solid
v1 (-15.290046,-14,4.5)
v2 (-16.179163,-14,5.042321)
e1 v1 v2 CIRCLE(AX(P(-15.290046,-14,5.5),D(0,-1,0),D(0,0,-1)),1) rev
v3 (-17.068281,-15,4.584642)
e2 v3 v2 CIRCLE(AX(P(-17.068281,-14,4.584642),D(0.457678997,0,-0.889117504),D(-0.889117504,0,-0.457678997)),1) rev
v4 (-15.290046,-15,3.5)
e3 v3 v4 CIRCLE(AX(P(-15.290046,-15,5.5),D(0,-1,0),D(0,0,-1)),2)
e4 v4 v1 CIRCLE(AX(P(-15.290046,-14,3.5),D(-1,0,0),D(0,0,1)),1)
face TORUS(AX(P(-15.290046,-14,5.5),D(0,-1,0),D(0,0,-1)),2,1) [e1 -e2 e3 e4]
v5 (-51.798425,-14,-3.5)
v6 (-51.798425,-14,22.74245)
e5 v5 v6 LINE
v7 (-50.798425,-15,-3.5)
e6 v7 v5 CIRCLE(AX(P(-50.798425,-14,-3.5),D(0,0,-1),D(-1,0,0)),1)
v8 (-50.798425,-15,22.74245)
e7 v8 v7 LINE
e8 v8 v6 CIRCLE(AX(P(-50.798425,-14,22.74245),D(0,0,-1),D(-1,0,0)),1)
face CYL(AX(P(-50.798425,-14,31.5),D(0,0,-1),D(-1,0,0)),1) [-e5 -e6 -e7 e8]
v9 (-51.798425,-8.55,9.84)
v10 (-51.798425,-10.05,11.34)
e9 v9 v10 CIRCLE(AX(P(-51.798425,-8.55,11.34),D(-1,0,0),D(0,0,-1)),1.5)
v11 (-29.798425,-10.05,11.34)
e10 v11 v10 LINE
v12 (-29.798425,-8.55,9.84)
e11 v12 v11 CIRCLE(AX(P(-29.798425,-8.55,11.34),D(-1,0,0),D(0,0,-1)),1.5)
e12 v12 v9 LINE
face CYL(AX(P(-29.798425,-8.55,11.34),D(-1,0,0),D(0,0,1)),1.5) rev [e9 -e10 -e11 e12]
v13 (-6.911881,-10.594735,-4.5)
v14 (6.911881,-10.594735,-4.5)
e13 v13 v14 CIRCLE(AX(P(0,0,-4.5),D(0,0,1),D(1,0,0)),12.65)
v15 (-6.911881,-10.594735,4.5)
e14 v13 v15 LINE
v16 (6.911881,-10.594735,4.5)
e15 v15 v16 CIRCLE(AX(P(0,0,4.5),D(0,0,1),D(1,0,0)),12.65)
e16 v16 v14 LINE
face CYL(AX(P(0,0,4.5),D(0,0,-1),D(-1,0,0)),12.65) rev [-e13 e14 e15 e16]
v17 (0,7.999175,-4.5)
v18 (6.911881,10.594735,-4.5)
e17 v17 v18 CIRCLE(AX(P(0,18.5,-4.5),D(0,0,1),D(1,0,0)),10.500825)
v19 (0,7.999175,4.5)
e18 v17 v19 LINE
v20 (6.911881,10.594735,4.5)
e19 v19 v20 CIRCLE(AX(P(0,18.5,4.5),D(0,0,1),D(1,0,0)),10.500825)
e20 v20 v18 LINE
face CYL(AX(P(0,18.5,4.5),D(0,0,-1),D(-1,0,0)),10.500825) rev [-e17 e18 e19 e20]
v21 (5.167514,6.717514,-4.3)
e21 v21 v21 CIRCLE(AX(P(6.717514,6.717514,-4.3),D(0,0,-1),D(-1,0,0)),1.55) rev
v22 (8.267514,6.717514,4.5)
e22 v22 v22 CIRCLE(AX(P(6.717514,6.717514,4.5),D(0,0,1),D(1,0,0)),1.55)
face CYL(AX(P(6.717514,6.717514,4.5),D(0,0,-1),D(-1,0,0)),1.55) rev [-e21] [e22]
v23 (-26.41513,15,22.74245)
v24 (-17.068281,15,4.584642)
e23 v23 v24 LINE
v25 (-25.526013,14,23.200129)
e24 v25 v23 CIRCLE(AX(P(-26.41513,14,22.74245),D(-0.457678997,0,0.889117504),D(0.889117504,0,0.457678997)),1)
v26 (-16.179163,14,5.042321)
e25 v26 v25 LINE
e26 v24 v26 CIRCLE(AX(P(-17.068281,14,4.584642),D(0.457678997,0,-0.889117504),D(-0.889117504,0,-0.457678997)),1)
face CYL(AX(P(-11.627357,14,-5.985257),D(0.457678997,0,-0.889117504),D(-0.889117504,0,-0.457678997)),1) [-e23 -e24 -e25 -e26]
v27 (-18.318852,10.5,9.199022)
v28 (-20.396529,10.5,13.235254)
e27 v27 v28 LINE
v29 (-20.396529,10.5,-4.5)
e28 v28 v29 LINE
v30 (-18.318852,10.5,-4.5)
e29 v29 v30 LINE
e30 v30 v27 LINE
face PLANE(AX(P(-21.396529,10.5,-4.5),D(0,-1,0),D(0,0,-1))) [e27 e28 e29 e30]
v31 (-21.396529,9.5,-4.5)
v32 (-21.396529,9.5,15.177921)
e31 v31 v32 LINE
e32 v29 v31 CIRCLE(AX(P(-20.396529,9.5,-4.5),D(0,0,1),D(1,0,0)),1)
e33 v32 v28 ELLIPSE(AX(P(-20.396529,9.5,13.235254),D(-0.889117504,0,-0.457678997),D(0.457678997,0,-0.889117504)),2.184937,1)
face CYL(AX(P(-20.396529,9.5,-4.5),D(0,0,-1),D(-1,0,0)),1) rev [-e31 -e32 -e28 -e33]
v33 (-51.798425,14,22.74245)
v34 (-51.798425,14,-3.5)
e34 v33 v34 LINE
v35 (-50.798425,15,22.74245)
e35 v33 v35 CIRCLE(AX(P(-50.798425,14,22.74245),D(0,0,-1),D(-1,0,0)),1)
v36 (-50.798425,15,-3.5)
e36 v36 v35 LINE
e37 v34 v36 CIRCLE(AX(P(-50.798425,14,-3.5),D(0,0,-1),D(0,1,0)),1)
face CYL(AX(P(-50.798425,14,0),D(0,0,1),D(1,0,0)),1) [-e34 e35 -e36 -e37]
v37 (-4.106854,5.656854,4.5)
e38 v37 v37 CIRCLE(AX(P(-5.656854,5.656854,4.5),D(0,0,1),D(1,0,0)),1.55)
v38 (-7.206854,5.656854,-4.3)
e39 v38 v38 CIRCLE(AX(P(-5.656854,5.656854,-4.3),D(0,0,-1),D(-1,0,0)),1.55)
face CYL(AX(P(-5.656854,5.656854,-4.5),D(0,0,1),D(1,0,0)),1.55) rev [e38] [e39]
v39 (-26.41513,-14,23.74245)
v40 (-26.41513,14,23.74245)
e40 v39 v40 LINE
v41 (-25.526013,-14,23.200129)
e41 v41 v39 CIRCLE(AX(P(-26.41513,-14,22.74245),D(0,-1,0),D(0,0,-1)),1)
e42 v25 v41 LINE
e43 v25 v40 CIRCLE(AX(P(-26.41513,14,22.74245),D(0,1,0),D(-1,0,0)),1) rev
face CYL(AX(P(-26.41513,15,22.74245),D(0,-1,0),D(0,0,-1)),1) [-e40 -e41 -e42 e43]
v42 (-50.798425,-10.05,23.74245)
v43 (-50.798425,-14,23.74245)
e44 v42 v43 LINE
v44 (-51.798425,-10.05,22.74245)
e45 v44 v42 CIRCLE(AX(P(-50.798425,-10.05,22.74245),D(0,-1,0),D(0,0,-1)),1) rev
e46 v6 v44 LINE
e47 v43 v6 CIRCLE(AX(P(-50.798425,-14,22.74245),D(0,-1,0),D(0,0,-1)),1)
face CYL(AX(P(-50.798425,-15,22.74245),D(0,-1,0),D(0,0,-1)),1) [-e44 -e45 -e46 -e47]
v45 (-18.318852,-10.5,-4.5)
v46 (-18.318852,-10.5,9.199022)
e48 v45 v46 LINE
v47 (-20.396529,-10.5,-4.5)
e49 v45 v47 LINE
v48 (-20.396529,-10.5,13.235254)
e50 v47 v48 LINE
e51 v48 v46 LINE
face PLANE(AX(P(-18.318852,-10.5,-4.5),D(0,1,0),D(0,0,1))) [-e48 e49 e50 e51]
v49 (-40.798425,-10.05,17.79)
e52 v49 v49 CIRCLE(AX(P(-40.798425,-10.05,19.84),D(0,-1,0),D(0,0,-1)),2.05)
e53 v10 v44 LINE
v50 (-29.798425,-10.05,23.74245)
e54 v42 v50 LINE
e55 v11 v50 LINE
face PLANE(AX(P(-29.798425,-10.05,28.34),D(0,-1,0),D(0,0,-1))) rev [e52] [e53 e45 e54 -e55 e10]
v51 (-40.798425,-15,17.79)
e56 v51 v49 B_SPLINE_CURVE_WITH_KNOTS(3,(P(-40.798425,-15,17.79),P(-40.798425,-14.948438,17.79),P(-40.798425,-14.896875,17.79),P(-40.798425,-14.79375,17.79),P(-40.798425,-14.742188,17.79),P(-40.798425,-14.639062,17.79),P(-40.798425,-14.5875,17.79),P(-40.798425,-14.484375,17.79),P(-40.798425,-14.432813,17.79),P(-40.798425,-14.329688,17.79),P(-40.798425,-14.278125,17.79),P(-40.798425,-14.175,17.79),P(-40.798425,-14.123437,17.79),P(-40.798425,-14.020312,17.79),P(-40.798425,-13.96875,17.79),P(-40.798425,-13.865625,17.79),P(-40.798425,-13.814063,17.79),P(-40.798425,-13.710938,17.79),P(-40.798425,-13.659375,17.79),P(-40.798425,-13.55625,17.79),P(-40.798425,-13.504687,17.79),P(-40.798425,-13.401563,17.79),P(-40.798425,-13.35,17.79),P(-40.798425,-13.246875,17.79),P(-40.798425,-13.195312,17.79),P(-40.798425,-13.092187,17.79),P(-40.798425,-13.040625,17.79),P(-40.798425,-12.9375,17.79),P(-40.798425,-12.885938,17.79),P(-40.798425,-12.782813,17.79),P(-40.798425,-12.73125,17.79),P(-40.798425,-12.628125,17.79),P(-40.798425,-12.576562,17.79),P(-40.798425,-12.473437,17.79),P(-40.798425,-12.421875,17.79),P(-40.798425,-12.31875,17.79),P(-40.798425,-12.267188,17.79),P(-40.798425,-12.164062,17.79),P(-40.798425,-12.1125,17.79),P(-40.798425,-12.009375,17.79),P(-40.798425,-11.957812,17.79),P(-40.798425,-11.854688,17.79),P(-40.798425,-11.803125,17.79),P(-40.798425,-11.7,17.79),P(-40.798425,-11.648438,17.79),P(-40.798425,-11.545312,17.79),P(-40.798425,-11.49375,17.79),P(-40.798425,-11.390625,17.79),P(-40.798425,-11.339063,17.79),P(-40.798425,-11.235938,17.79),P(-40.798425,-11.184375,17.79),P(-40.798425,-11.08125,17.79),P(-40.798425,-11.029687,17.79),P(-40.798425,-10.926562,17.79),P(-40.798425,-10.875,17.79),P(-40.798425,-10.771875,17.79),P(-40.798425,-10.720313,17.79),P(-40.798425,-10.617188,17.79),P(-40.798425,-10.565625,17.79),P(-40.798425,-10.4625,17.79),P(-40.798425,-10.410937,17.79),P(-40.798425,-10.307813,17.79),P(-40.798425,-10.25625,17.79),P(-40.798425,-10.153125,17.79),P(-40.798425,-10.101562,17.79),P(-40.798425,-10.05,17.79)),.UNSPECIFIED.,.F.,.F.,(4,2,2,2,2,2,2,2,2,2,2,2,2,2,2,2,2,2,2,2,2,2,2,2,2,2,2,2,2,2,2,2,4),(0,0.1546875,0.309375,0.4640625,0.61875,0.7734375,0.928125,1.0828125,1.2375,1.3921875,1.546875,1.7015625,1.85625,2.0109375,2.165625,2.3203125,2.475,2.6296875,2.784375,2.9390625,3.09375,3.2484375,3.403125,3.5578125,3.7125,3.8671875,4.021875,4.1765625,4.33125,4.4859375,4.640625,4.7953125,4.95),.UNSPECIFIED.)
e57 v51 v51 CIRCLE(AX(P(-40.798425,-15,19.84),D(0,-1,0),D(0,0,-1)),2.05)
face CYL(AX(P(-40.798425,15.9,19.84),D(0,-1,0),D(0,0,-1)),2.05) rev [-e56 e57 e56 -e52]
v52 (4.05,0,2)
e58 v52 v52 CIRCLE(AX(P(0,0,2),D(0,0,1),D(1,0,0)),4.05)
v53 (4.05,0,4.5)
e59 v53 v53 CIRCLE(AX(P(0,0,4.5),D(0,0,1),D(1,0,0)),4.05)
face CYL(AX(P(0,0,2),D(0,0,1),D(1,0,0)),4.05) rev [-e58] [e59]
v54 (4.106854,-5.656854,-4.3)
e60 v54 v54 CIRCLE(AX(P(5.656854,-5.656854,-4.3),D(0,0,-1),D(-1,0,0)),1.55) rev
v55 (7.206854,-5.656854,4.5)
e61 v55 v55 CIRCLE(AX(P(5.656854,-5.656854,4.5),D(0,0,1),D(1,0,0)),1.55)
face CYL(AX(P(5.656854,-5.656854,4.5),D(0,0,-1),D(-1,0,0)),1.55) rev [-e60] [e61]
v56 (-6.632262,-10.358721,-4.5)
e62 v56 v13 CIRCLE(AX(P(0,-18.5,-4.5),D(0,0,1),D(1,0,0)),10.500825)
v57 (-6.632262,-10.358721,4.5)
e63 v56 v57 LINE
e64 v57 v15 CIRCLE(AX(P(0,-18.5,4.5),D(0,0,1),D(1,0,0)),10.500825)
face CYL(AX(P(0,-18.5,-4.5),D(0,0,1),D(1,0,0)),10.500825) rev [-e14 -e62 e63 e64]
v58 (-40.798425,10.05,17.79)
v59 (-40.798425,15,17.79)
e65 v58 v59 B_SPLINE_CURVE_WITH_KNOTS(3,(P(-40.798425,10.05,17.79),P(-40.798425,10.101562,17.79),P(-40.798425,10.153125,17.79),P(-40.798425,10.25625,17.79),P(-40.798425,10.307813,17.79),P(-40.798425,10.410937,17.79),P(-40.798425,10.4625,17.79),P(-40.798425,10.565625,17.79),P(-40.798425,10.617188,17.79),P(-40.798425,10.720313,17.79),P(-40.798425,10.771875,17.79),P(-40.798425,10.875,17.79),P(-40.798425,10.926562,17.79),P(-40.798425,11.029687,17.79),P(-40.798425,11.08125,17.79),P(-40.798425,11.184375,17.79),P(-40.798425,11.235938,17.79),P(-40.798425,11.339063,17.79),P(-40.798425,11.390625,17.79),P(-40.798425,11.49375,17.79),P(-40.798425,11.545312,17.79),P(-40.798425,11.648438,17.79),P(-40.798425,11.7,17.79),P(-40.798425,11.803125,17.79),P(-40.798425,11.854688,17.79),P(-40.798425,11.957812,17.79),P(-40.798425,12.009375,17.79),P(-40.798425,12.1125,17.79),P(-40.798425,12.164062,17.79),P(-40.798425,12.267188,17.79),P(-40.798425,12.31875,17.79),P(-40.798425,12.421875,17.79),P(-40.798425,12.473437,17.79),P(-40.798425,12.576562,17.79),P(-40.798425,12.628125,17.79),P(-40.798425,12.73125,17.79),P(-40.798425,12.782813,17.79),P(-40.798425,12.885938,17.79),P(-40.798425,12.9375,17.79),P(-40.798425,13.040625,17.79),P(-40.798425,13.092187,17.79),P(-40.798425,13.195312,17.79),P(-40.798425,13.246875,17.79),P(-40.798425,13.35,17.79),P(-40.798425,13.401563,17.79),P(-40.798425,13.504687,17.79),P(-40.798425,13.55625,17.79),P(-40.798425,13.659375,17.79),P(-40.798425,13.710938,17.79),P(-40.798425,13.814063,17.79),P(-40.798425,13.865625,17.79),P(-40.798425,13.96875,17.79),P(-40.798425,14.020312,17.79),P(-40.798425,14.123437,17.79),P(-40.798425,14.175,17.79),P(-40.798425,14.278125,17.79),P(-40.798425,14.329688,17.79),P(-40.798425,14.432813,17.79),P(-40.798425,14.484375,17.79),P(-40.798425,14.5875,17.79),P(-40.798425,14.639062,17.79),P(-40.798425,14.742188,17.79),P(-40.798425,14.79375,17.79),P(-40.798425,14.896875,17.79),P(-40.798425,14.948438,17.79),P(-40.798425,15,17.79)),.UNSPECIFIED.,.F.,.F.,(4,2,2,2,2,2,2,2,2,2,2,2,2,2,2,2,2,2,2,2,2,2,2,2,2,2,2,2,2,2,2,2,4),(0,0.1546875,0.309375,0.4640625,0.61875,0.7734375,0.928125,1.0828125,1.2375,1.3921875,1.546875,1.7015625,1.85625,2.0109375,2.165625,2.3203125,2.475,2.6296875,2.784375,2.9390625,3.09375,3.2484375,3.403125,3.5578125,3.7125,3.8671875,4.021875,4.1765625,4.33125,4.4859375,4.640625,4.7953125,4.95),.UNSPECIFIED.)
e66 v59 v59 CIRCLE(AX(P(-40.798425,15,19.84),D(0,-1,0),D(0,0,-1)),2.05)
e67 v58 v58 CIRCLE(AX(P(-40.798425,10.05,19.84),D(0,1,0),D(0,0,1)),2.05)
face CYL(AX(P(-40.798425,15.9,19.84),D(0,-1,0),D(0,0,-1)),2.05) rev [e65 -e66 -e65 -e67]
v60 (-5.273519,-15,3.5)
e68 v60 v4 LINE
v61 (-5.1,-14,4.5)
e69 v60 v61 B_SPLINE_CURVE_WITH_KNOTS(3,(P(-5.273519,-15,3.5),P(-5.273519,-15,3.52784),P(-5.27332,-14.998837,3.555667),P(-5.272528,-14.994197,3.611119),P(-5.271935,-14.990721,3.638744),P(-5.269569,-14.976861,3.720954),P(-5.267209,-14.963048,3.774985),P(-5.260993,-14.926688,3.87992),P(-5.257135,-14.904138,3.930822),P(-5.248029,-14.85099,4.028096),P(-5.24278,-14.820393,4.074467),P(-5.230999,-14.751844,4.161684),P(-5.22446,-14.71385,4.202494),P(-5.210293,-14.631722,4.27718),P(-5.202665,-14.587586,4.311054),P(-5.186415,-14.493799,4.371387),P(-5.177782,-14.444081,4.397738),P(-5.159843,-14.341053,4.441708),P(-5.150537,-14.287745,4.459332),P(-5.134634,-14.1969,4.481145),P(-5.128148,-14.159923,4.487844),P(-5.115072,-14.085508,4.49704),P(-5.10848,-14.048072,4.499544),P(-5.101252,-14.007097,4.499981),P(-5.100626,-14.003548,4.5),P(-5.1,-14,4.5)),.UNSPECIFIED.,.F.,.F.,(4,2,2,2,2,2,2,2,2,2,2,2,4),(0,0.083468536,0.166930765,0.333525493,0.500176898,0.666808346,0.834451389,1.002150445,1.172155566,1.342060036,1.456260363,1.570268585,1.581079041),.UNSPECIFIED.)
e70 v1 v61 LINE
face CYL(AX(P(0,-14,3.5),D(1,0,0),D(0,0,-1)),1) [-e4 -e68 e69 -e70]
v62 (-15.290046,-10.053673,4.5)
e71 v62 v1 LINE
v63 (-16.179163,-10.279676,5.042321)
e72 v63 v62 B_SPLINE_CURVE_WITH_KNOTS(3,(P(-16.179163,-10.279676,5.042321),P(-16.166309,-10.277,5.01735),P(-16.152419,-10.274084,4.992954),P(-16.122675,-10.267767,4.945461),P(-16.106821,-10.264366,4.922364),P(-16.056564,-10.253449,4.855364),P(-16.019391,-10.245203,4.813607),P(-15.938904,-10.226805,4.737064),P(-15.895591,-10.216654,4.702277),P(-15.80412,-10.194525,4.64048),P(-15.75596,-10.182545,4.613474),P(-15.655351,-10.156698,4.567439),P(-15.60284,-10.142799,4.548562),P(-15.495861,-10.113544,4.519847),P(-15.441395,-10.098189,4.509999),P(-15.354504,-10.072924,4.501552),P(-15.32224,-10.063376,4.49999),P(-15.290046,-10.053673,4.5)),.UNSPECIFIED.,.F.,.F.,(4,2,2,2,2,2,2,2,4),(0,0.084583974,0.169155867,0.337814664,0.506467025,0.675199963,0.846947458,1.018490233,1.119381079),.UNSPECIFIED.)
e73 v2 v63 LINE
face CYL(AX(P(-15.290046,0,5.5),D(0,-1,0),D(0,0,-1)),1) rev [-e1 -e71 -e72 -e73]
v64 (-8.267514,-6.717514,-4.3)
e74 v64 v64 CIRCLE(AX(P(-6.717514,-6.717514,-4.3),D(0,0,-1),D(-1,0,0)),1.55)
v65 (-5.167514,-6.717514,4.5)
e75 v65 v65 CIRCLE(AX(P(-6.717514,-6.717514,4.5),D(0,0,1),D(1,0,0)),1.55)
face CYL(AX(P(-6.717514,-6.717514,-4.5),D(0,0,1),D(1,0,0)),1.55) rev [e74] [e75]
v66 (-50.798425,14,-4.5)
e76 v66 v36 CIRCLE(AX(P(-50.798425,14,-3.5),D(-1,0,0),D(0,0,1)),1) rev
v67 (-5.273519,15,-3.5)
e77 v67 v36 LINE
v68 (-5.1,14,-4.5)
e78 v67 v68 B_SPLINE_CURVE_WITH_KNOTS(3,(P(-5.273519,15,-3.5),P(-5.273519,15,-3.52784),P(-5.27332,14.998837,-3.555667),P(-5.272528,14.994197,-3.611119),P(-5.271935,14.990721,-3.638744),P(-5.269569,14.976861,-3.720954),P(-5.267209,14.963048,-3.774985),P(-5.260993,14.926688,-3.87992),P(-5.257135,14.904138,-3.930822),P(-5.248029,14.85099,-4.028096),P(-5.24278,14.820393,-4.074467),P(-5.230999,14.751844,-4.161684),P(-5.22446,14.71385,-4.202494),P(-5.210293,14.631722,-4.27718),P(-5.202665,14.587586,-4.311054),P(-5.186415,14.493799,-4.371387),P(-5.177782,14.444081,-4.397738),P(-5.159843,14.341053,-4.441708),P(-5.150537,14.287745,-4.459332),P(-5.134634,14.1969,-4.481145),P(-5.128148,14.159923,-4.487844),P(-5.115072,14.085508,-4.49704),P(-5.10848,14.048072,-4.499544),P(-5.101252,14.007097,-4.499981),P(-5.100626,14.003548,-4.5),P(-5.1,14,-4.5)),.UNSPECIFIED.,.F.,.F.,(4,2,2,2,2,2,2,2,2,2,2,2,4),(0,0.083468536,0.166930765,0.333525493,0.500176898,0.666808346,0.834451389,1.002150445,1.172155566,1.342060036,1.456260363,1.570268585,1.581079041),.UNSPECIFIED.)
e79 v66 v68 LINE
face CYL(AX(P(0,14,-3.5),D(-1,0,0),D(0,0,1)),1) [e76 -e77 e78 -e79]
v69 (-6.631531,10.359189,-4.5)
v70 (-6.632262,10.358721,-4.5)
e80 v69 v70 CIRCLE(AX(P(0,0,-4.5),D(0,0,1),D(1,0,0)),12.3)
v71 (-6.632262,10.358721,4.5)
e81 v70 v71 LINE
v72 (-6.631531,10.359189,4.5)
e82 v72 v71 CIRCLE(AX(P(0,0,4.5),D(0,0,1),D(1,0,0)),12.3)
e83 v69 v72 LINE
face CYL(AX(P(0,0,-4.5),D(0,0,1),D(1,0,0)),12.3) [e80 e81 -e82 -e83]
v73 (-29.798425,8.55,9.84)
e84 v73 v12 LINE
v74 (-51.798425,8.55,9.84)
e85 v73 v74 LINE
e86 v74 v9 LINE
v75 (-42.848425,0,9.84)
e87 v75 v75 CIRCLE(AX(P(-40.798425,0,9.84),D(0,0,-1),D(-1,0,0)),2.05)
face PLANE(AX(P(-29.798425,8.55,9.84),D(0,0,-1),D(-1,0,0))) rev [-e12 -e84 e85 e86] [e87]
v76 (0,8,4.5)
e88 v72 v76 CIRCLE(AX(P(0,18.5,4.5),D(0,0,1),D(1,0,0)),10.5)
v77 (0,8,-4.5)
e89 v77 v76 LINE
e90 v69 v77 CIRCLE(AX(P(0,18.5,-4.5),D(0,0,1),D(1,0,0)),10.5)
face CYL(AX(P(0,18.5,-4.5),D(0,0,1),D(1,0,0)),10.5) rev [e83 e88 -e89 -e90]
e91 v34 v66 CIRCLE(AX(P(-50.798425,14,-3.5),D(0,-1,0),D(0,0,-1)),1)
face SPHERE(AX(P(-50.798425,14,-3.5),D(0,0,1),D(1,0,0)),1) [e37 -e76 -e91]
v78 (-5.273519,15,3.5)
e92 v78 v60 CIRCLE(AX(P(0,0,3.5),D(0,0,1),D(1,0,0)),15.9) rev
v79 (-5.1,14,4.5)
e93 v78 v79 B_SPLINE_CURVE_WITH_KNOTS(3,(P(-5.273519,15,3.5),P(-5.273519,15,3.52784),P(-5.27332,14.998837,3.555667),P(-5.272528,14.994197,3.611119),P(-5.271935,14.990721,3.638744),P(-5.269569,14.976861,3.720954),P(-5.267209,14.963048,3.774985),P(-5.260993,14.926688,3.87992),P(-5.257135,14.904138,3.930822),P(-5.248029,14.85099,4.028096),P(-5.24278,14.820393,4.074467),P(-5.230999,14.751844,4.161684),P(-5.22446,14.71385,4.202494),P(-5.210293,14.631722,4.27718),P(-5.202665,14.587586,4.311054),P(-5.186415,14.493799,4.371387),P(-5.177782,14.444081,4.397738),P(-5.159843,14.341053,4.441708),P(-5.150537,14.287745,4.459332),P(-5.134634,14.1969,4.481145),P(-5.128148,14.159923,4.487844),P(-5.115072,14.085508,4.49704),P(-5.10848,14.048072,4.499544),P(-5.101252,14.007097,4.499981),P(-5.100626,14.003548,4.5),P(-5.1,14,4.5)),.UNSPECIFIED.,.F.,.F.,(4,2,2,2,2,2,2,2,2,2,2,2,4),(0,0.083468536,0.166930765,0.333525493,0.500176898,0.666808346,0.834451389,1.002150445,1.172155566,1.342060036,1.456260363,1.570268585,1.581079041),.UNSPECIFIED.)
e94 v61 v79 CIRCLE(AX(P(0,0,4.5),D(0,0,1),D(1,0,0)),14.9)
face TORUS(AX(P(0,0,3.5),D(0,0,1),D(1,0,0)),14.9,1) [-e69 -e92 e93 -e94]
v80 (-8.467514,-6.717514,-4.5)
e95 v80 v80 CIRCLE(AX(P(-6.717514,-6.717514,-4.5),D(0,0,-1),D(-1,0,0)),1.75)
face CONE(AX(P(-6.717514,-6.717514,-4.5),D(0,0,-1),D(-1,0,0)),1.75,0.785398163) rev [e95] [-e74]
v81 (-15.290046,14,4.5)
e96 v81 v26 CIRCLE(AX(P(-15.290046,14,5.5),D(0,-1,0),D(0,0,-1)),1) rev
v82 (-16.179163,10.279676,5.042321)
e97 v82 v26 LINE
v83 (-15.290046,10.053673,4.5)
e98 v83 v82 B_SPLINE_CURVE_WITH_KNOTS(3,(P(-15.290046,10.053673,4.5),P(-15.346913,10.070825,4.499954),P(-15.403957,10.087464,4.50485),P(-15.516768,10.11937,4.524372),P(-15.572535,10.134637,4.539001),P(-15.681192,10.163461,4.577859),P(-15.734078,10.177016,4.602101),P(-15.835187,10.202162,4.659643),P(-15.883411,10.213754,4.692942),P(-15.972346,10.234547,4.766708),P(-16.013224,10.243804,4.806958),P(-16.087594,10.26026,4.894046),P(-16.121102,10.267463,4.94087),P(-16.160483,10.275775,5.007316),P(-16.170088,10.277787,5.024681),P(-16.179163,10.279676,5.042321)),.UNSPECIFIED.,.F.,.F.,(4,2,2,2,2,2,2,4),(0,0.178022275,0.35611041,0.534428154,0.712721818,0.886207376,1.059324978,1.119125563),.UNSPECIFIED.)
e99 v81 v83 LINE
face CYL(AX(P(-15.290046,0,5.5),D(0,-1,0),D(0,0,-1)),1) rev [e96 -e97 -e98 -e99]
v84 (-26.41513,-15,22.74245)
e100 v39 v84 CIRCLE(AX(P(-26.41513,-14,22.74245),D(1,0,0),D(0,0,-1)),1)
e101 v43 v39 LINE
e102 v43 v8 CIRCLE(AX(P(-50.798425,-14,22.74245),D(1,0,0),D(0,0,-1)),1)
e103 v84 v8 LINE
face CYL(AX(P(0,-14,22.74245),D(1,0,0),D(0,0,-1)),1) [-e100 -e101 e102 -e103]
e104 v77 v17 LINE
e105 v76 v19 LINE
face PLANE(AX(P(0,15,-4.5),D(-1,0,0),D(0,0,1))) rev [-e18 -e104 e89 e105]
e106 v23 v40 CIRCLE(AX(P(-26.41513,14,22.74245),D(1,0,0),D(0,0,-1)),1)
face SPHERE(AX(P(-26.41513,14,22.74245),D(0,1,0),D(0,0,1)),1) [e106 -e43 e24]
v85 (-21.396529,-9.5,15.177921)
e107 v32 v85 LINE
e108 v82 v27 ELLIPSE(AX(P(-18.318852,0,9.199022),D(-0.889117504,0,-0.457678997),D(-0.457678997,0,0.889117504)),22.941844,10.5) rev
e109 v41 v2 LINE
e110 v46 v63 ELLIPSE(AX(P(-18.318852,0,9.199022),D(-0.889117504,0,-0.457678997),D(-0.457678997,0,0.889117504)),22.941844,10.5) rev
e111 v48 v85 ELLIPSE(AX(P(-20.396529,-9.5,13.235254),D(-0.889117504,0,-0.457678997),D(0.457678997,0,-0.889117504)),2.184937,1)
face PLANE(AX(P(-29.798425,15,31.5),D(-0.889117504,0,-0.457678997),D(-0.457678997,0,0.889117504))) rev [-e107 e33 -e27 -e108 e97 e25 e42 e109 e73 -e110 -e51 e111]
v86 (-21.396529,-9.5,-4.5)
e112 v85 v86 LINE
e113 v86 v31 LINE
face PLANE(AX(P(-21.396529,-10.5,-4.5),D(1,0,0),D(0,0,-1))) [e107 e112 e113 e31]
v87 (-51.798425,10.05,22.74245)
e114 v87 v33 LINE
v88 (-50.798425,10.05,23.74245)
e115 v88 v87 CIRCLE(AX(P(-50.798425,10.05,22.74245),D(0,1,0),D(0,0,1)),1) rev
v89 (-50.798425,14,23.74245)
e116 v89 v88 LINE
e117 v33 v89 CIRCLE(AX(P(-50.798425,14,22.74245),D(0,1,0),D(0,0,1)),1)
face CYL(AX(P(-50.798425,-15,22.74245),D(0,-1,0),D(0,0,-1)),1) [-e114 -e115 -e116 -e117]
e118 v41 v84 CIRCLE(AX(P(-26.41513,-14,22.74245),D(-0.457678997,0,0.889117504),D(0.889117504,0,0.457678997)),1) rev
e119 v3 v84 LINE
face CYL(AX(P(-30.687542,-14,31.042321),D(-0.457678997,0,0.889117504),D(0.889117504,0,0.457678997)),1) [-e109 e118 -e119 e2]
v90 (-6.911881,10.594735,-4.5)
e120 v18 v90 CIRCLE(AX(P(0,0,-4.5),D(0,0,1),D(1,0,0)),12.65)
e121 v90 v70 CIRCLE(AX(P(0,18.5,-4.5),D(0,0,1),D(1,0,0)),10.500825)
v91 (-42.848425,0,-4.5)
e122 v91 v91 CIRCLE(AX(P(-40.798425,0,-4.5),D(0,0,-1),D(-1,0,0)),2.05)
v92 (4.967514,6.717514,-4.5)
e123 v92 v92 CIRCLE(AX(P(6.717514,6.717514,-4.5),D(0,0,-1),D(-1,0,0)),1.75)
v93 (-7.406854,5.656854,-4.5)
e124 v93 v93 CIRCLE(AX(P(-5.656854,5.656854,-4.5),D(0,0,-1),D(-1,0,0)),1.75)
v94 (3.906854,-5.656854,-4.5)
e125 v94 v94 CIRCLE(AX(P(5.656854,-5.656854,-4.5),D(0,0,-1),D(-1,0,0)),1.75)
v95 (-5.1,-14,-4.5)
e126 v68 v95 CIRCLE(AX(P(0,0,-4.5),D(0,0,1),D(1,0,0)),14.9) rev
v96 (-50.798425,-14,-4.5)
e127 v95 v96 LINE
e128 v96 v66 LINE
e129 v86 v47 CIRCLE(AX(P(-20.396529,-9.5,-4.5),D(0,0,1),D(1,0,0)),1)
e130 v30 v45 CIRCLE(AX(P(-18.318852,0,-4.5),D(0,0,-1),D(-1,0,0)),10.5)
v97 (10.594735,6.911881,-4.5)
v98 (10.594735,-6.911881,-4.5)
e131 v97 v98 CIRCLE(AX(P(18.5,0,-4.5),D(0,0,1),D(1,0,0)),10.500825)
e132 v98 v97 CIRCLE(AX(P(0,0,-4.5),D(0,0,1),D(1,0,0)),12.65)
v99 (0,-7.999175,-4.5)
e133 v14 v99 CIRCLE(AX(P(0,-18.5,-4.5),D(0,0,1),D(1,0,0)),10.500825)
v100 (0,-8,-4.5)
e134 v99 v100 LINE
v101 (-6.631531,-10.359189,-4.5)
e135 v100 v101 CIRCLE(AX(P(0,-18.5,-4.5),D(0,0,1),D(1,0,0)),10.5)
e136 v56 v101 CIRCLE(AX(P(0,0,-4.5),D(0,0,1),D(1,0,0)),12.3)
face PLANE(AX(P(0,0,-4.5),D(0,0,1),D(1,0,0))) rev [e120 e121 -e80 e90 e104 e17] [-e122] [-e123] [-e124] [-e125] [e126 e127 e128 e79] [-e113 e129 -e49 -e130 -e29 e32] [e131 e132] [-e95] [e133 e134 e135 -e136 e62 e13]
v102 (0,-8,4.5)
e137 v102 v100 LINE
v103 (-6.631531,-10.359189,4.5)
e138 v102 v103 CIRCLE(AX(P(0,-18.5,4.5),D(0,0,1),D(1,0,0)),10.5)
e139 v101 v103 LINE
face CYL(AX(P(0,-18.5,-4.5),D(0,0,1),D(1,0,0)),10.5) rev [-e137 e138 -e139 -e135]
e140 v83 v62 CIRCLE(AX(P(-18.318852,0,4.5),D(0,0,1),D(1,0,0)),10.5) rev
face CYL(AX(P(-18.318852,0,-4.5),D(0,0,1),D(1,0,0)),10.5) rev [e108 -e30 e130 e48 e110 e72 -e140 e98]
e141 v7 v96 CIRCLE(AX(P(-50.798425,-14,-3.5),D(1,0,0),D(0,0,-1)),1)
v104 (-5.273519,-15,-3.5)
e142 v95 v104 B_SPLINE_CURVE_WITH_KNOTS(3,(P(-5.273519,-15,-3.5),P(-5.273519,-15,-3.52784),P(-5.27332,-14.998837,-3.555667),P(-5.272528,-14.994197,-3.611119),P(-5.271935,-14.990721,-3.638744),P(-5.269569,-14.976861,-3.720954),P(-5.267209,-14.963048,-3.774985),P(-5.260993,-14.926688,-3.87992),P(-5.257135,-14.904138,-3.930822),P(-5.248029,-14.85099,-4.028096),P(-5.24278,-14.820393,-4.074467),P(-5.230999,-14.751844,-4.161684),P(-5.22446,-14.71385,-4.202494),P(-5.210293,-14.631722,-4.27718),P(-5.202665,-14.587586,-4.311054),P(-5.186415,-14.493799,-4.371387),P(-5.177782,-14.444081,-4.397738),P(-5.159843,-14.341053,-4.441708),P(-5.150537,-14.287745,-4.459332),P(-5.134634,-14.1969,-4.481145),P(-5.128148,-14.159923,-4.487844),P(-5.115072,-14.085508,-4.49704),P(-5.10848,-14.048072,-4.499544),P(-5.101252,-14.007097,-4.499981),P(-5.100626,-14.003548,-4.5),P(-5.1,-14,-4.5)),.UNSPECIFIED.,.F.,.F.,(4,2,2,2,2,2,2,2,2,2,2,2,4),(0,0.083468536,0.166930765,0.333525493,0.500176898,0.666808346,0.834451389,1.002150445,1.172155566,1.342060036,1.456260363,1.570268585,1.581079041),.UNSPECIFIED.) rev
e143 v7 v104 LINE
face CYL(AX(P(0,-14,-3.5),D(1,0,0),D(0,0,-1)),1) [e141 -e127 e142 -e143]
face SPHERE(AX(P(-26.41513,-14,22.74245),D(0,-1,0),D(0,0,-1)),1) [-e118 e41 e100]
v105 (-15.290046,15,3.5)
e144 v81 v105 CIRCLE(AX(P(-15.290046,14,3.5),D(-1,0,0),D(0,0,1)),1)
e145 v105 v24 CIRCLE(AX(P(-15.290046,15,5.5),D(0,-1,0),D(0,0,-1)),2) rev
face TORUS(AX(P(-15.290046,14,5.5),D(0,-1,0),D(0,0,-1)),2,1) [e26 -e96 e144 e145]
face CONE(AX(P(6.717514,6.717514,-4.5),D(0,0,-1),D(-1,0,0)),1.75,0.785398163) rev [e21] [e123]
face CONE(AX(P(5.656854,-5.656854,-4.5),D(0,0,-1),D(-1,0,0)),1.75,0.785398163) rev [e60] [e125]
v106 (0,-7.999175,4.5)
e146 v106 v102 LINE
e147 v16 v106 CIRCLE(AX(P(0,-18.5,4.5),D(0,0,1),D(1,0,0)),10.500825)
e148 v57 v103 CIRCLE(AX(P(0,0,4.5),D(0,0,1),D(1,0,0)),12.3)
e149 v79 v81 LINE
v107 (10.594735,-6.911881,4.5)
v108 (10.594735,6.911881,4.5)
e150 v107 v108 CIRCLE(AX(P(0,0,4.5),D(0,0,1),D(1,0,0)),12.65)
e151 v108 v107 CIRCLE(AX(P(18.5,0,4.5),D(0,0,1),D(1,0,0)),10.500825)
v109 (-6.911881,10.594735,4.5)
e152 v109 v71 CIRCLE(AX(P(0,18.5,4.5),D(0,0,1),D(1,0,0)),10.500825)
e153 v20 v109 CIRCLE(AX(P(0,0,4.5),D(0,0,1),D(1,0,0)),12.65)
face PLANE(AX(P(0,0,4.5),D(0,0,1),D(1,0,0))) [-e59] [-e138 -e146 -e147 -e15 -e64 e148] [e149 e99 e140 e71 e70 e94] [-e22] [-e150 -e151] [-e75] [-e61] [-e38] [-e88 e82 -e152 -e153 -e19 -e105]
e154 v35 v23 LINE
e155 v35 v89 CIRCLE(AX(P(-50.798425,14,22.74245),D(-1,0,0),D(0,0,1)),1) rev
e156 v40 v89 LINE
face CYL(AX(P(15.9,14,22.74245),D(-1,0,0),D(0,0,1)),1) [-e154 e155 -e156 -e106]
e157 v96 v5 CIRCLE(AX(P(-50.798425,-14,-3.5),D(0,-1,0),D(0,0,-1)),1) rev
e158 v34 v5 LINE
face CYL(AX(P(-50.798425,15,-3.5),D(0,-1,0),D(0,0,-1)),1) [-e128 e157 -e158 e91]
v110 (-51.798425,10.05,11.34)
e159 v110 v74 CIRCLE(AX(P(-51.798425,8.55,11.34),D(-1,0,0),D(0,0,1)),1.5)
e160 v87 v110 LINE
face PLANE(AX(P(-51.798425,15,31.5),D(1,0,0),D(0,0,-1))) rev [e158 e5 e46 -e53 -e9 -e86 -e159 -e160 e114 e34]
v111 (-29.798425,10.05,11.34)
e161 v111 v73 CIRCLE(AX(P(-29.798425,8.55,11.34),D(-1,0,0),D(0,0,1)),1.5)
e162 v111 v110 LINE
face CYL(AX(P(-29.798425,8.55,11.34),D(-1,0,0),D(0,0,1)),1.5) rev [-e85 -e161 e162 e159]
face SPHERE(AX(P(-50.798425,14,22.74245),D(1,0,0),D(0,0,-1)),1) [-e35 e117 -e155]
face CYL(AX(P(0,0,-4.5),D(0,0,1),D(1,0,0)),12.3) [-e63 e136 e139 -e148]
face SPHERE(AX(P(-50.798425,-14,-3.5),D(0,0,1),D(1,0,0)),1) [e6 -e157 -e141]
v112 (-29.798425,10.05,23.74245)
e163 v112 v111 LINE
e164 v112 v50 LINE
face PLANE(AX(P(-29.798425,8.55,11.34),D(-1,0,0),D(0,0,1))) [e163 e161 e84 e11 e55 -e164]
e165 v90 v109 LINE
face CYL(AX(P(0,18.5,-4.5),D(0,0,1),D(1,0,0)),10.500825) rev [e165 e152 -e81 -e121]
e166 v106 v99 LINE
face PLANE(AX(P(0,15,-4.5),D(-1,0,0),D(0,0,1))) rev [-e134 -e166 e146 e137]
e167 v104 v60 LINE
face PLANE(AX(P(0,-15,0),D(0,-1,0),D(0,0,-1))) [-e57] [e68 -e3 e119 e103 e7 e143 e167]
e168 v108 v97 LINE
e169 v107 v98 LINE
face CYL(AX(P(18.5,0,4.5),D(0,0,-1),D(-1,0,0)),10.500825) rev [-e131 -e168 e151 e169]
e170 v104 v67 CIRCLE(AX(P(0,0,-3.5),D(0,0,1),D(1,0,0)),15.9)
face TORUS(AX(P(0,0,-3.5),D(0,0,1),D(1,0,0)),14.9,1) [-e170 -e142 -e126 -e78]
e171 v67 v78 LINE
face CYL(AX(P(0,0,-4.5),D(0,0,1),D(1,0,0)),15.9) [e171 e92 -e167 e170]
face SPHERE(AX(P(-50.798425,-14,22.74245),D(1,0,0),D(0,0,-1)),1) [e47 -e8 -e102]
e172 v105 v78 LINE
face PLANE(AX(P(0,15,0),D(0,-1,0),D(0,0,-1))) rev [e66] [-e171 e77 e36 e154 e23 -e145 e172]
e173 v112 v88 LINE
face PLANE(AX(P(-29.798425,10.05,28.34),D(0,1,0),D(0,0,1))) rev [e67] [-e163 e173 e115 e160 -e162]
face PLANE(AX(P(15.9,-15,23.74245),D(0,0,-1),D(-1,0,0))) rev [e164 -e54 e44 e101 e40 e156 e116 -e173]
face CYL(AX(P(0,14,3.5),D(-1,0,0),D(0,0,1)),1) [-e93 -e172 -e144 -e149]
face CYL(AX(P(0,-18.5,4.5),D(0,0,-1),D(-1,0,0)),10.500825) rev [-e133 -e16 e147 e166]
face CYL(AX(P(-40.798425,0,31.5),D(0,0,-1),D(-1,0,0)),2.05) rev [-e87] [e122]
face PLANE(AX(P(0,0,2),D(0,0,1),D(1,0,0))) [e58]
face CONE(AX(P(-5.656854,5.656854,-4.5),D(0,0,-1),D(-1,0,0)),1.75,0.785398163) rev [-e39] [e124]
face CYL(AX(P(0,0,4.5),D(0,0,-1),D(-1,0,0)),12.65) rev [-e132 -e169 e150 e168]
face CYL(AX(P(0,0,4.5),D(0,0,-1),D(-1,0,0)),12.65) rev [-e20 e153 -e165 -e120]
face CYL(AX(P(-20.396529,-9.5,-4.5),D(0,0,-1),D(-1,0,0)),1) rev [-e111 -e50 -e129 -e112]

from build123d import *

# Parameters (mm, degrees)
ESQUISSE4_R                   = 13.9
ESQUISSE4_R_2                 = 1.55
BOSS_EXTRU_3_DEPTH            = 4.5
ESQUISSE7_R                   = 15.9
ESQUISSE7_R_2                 = 13.9
BOSS_EXTRU_7_DEPTH            = 9
BOSS_EXTRU_8_DEPTH            = 30
ENL_V_START                   = -4.5
ENL_V_MAT_EXTRU_12_OUTLINE_R  = 1.55
ENL_V_MAT_EXTRU_12_DEPTH      = 9
TROU_TARAUD_M32_D             = 2.5
TROU_TARAUD_M32_DEPTH         = 36
TROU_TARAUD_M32_CSINK_D       = 3.5
TROU_TARAUD_M32_CSINK_ANGLE   = 90
ENL_V_MAT_EXTRU_1_DEPTH       = 22
ESQUISSE13_R                  = 2.05
ENL_V_MAT_EXTRU_4_DEPTH       = 69.045108798
ESQUISSE15_R                  = 2.05
ENL_V_MAT_EXTRU_5_DEPTH       = 66.052954056
ENL_V_MAT_EXTRU_6_DEPTH       = 77.342234353
ESQUISSE24_R                  = 4.05
ENL_V_MAT_EXTRU_9_DEPTH       = 2.5
TROU_TARAUD_M33_D             = 2.5
TROU_TARAUD_M33_DEPTH         = 28.24245014
TROU_TARAUD_M33_CSINK_D       = 3.5
TROU_TARAUD_M33_CSINK_ANGLE   = 90
CONG_2_R                      = 1
ENL_V_MAT_EXTRU_13_DEPTH      = 58.499206362
ENL_V_MAT_EXTRU_13_DEPTH_BACK = 58.499206362
CONG_3_R                      = 1
CONG_4_R                      = 1


# Read off the part's stored shape, not the designer's step: Enlèv. mat.-Extru.12
with BuildPart() as part:
    # Esquisse4 → Boss.-Extru.3 (new, symmetric)
    with BuildSketch(Plane.XY):
        Circle(ESQUISSE4_R)
        with Locations((-6.717514421, -6.717514421)):
            Circle(ESQUISSE4_R_2, mode=Mode.SUBTRACT)
        with Locations((6.717514421, 6.717514421)):
            Circle(ESQUISSE4_R_2, mode=Mode.SUBTRACT)
        with Locations((-5.656854249, 5.656854249)):
            Circle(ESQUISSE4_R_2, mode=Mode.SUBTRACT)
        with Locations((5.656854249, -5.656854249)):
            Circle(ESQUISSE4_R_2, mode=Mode.SUBTRACT)
        with BuildLine():
            ThreePointArc((-10.594734512, 6.911881121), (-12.65, 0), (-10.594734512, -6.911881121))
            ThreePointArc((-10.594734512, -6.911881121), (-7.999175124, 0), (-10.594734512, 6.911881121))
        make_face(mode=Mode.SUBTRACT)
        with BuildLine():
            ThreePointArc((6.911881121, -10.594734512), (0, -7.999175124), (-6.911881121, -10.594734512))
            ThreePointArc((-6.911881121, -10.594734512), (0, -12.65), (6.911881121, -10.594734512))
        make_face(mode=Mode.SUBTRACT)
        with BuildLine():
            ThreePointArc((-6.911881121, 10.594734512), (0, 7.999175124), (6.911881121, 10.594734512))
            ThreePointArc((6.911881121, 10.594734512), (0, 12.65), (-6.911881121, 10.594734512))
        make_face(mode=Mode.SUBTRACT)
        with BuildLine():
            ThreePointArc((10.594734512, 6.911881121), (7.999175124, 0), (10.594734512, -6.911881121))
            ThreePointArc((10.594734512, -6.911881121), (12.65, 0), (10.594734512, 6.911881121))
        make_face(mode=Mode.SUBTRACT)
    extrude(amount=BOSS_EXTRU_3_DEPTH, both=True)

    # Esquisse7 → Boss.-Extru.7 (add)
    with BuildSketch(Plane.XY.offset(4.5)):
        Circle(ESQUISSE7_R)
        Circle(ESQUISSE7_R_2, mode=Mode.SUBTRACT)
    extrude(amount=-BOSS_EXTRU_7_DEPTH)

    # Esquisse6 → Boss.-Extru.8 (add)
    with BuildSketch(Plane(origin=(0, -15, 0), x_dir=(1, 0, 0), z_dir=(0, 1, 0))):
        Polygon((-51.798424989, -31.5), (-29.798424989, -31.5), (-15.9, -4.5), (0, -4.5), (0, 4.5), (-15.9, 4.5), (-51.798424989, 4.5), align=None)
    extrude(amount=BOSS_EXTRU_8_DEPTH)

    # Enlèv. mat.-Extru.12 outline → Enlèv. mat.-Extru.12 (cut)
    with BuildSketch(Plane.XY.offset(ENL_V_START)):
        with BuildLine():
            ThreePointArc((0, 12.65), (-3.605489456, 12.125301884), (-6.911881121, 10.594734512))
            ThreePointArc((-6.911881121, 10.594734512), (-6.773099648, 10.475509721), (-6.632262004, 10.358720998))
            ThreePointArc((-6.632262004, 10.358720998), (-6.631896353, 10.3589551), (-6.631530694, 10.359189189))
            ThreePointArc((-6.631530694, 10.359189189), (-3.519338467, 8.607363508), (0, 8))
            Line((0, 8), (0, 12.65))
        make_face()
        with BuildLine():
            ThreePointArc((-6.911881121, -10.594734512), (-3.605489456, -12.125301884), (0, -12.65))
            Line((0, -12.65), (0, -8))
            ThreePointArc((0, -8), (-3.519338467, -8.607363508), (-6.631530694, -10.359189189))
            ThreePointArc((-6.631530694, -10.359189189), (-6.631896353, -10.3589551), (-6.632262004, -10.358720998))
            ThreePointArc((-6.632262004, -10.358720998), (-6.773099648, -10.475509721), (-6.911881121, -10.594734512))
        make_face()
        with BuildLine():
            ThreePointArc((-10.358720998, 6.632262004), (-10.475509721, 6.773099648), (-10.594734512, 6.911881121))
            ThreePointArc((-10.594734512, 6.911881121), (-12.65, 0), (-10.594734512, -6.911881121))
            ThreePointArc((-10.594734512, -6.911881121), (-10.475509721, -6.773099648), (-10.358720998, -6.632262004))
            ThreePointArc((-10.358720998, -6.632262004), (-10.3589551, -6.631896353), (-10.359189189, -6.631530694))
            ThreePointArc((-10.359189189, -6.631530694), (-8, 0), (-10.359189189, 6.631530694))
            ThreePointArc((-10.359189189, 6.631530694), (-10.3589551, 6.631896353), (-10.358720998, 6.632262004))
        make_face()
        with Locations((-6.717514421, -6.717514421)):
            Circle(ENL_V_MAT_EXTRU_12_OUTLINE_R)
        with Locations((-5.656854249, 5.656854249)):
            Circle(ENL_V_MAT_EXTRU_12_OUTLINE_R)
    extrude(amount=ENL_V_MAT_EXTRU_12_DEPTH, mode=Mode.SUBTRACT)

    # Trou taraudé M32
    with Locations(Plane(origin=(5.656854249, -5.656854249, -4.5), x_dir=(-1, 0, 0), z_dir=(0, 0, -1))):
        with Locations((0, 0), (-1.060660172, 12.37436867)):
            CounterSinkHole(TROU_TARAUD_M32_D / 2, TROU_TARAUD_M32_CSINK_D / 2, depth=TROU_TARAUD_M32_DEPTH, counter_sink_angle=TROU_TARAUD_M32_CSINK_ANGLE)

    # Esquisse8 → Enlèv. mat.-Extru.1 (cut)
    with BuildSketch(Plane.ZY.offset(51.798424989)):
        with BuildLine():
            Line((28.34, 10.05), (11.34, 10.05))
            ThreePointArc((11.34, 10.05), (10.279339828, 9.610660172), (9.84, 8.55))
            Line((9.84, 8.55), (9.84, -8.55))
            ThreePointArc((9.84, -8.55), (10.279339828, -9.610660172), (11.34, -10.05))
            Line((11.34, -10.05), (28.34, -10.05))
            ThreePointArc((28.34, -10.05), (29.400660172, -9.610660172), (29.84, -8.55))
            Line((29.84, -8.55), (29.84, 8.55))
            ThreePointArc((29.84, 8.55), (29.400660172, 9.610660172), (28.34, 10.05))
        make_face()
    extrude(amount=-ENL_V_MAT_EXTRU_1_DEPTH, mode=Mode.SUBTRACT)

    # Esquisse13 → Enlèv. mat.-Extru.4 (cut, through all)
    with BuildSketch(Plane.XZ.offset(15)):
        with Locations(Location((-40.798424989, 19.84, 0), (0, 0, 270))):
            Circle(ESQUISSE13_R)
    extrude(amount=-ENL_V_MAT_EXTRU_4_DEPTH, mode=Mode.SUBTRACT)

    # Esquisse15 → Enlèv. mat.-Extru.5 (cut, through all)
    with BuildSketch(Plane(origin=(0, 0, -4.5), x_dir=(-1, 0, 0), z_dir=(0, 0, -1))):
        with Locations((40.798424989, 0)):
            Circle(ESQUISSE15_R)
    extrude(amount=-ENL_V_MAT_EXTRU_5_DEPTH, mode=Mode.SUBTRACT)

    # Esquisse16 → Enlèv. mat.-Extru.6 (cut, through all)
    with BuildSketch(Plane.ZY.offset(51.798424989)):
        Polygon((23.74245014, 10.05), (23.74245014, -10.05), (23.74245014, -15), (31.5, -15), (31.5, 15), (23.74245014, 15), align=None)
    extrude(amount=-ENL_V_MAT_EXTRU_6_DEPTH, mode=Mode.SUBTRACT)

    # Esquisse24 → Enlèv. mat.-Extru.9 (cut)
    with BuildSketch(Plane.XY.offset(4.5)):
        Circle(ESQUISSE24_R)
    extrude(amount=-ENL_V_MAT_EXTRU_9_DEPTH, mode=Mode.SUBTRACT)

    # Trou taraudé M33
    with Locations(Plane(origin=(0, 0, -4.5), x_dir=(-1, 0, 0), z_dir=(0, 0, -1))):
        with Locations((6.717514421, -6.717514421), (5.656854249, 5.656854249)):
            CounterSinkHole(TROU_TARAUD_M33_D / 2, TROU_TARAUD_M33_CSINK_D / 2, depth=TROU_TARAUD_M33_DEPTH, counter_sink_angle=TROU_TARAUD_M33_CSINK_ANGLE)

    # Congé2
    cong_2_edges = [part.edges().sort_by_distance(p)[0] for p in [
        (-20.852587961, -15, 14.12122507),
        (-20.852587961, 15, 14.12122507),
        (-38.801800455, 15, 23.74245014),
        (-25.805175921, 0, 23.74245014),
        (-38.801800455, -15, 23.74245014),
        (15.9, 0, -4.5),
        (15.9, 0, 4.5),
        (-15.9, 0, 4.5),
        (-10.586759375, -15, 4.5),
        (-28.535971869, -15, -4.5),
        (-51.798424989, 0, -4.5),
        (-28.535971869, 15, -4.5),
        (-10.586759375, 15, 4.5),
    ]]
    fillet(cong_2_edges, radius=CONG_2_R)

    # Esquisse27 → Enlèv. mat.-Extru.13 (cut, two sides: drawn at the far end of the back side and taken through both)
    with BuildSketch(Plane.XY.offset(4.5).offset(-ENL_V_MAT_EXTRU_13_DEPTH_BACK)):
        with BuildLine():
            Line((-18.31885198, -10.5), (-21.396528806, -10.5))
            Line((-21.396528806, -10.5), (-21.396528806, 10.5))
            Line((-21.396528806, 10.5), (-18.31885198, 10.5))
            ThreePointArc((-18.31885198, 10.5), (-7.81885198, 0), (-18.31885198, -10.5))
        make_face()
    extrude(amount=ENL_V_MAT_EXTRU_13_DEPTH + ENL_V_MAT_EXTRU_13_DEPTH_BACK, mode=Mode.SUBTRACT)

    # Congé3
    cong_3_edges = [part.edges().sort_by_distance(p)[0] for p in [
        (-21.396528806, 10.5, 5.338960274),
        (-21.396528806, -10.5, 5.338960274),
    ]]
    fillet(cong_3_edges, radius=CONG_3_R)

    # Congé4
    # the kernel refuses this fillet: 1 mm, written as the material it takes off along each edge
    with BuildSketch(Plane(origin=(-50.798424989, 14, -3.5), x_dir=(-1, 0, 0), z_dir=(0, 1, 0))) as cong_4_piece_1_section:
        Polygon((0, 0), (CONG_4_R, 0), (CONG_4_R, -CONG_4_R), (0, -CONG_4_R), align=None)
    cong_4_piece_1 = extrude(amount=CONG_4_R, mode=Mode.PRIVATE)
    cong_4_piece_1 = cong_4_piece_1 - Plane(origin=(-50.798424989, 14, -3.5), x_dir=(0.7071067811865477, 0, 0.7071067811865475), z_dir=(0, 1, 0)) * Sphere(CONG_4_R, mode=Mode.PRIVATE)
    add(cong_4_piece_1, mode=Mode.SUBTRACT)
    with BuildSketch(Plane(origin=(-50.798424989, -14, -3.5), x_dir=(-1, 0, 0), z_dir=(0, -1, 0))) as cong_4_piece_2_section:
        Polygon((0, 0), (CONG_4_R, 0), (CONG_4_R, CONG_4_R), (0, CONG_4_R), align=None)
    cong_4_piece_2 = extrude(amount=CONG_4_R, mode=Mode.PRIVATE)
    cong_4_piece_2 = cong_4_piece_2 - Plane(origin=(-50.798424989, -14, -3.5), x_dir=(0.7071067811865477, 0, 0.7071067811865475), z_dir=(0, -1, 0)) * Sphere(CONG_4_R, mode=Mode.PRIVATE)
    add(cong_4_piece_2, mode=Mode.SUBTRACT)
    with BuildSketch(Plane(origin=(-51.798424989, -14, 23.74245014), x_dir=(1, 0, 0), z_dir=(0, 1, 0)), Plane(origin=(-51.798424989, 7.55, 23.74245014), x_dir=(1, 0, 0), z_dir=(0, 1, 0))) as cong_4_piece_3:
        with BuildLine():
            CenterArc((CONG_4_R, CONG_4_R), CONG_4_R, 180, 90)
            Line((0, CONG_4_R), (0, 0))
            Line((0, 0), (CONG_4_R, 0))
        make_face()
    extrude(amount=6.45, mode=Mode.SUBTRACT)
    with BuildSketch(Plane(origin=(-51.798424989, -15, -3.5), x_dir=(1, 0, 0), z_dir=(0, 0, 1))) as cong_4_piece_4:
        with BuildLine():
            CenterArc((CONG_4_R, CONG_4_R), CONG_4_R, 180, 90)
            Line((0, CONG_4_R), (0, 0))
            Line((0, 0), (CONG_4_R, 0))
        make_face()
    extrude(amount=26.24245014, mode=Mode.SUBTRACT)
    with BuildSketch(Plane(origin=(-51.798424989, 15, -3.5), x_dir=(1, 0, 0), z_dir=(0, 0, 1))) as cong_4_piece_5:
        with BuildLine():
            CenterArc((CONG_4_R, -CONG_4_R), CONG_4_R, 90, 90)
            Line((0, -CONG_4_R), (0, 0))
            Line((0, 0), (CONG_4_R, 0))
        make_face()
    extrude(amount=26.24245014, mode=Mode.SUBTRACT)
    with BuildSketch(Plane(origin=(-51.798424989, 14, 22.74245014), x_dir=(0, 0, 1), z_dir=(0, -1, 0))) as cong_4_piece_6:
        with BuildLine():
            CenterArc((1 - CONG_4_R, -CONG_4_R), CONG_4_R, 0, 90)
            Line((1, -CONG_4_R), (1, 0))
            Line((1, 0), (1 - CONG_4_R, 0))
        make_face()
    revolve(axis=Axis((-51.798424989, 14, 22.74245014), (-1, 0, 0)), revolution_arc=90, mode=Mode.SUBTRACT)
    with BuildSketch(Plane(origin=(-51.798424989, -14, 22.74245014), x_dir=(0, 0, 1), z_dir=(0, 1, 0))) as cong_4_piece_7:
        with BuildLine():
            CenterArc((1 - CONG_4_R, CONG_4_R), CONG_4_R, 270, 90)
            Line((1 - CONG_4_R, 0), (1, 0))
            Line((1, 0), (1, CONG_4_R))
        make_face()
    revolve(axis=Axis((-51.798424989, -14, 22.74245014), (1, 0, 0)), revolution_arc=90, mode=Mode.SUBTRACT)


solid = part.part
